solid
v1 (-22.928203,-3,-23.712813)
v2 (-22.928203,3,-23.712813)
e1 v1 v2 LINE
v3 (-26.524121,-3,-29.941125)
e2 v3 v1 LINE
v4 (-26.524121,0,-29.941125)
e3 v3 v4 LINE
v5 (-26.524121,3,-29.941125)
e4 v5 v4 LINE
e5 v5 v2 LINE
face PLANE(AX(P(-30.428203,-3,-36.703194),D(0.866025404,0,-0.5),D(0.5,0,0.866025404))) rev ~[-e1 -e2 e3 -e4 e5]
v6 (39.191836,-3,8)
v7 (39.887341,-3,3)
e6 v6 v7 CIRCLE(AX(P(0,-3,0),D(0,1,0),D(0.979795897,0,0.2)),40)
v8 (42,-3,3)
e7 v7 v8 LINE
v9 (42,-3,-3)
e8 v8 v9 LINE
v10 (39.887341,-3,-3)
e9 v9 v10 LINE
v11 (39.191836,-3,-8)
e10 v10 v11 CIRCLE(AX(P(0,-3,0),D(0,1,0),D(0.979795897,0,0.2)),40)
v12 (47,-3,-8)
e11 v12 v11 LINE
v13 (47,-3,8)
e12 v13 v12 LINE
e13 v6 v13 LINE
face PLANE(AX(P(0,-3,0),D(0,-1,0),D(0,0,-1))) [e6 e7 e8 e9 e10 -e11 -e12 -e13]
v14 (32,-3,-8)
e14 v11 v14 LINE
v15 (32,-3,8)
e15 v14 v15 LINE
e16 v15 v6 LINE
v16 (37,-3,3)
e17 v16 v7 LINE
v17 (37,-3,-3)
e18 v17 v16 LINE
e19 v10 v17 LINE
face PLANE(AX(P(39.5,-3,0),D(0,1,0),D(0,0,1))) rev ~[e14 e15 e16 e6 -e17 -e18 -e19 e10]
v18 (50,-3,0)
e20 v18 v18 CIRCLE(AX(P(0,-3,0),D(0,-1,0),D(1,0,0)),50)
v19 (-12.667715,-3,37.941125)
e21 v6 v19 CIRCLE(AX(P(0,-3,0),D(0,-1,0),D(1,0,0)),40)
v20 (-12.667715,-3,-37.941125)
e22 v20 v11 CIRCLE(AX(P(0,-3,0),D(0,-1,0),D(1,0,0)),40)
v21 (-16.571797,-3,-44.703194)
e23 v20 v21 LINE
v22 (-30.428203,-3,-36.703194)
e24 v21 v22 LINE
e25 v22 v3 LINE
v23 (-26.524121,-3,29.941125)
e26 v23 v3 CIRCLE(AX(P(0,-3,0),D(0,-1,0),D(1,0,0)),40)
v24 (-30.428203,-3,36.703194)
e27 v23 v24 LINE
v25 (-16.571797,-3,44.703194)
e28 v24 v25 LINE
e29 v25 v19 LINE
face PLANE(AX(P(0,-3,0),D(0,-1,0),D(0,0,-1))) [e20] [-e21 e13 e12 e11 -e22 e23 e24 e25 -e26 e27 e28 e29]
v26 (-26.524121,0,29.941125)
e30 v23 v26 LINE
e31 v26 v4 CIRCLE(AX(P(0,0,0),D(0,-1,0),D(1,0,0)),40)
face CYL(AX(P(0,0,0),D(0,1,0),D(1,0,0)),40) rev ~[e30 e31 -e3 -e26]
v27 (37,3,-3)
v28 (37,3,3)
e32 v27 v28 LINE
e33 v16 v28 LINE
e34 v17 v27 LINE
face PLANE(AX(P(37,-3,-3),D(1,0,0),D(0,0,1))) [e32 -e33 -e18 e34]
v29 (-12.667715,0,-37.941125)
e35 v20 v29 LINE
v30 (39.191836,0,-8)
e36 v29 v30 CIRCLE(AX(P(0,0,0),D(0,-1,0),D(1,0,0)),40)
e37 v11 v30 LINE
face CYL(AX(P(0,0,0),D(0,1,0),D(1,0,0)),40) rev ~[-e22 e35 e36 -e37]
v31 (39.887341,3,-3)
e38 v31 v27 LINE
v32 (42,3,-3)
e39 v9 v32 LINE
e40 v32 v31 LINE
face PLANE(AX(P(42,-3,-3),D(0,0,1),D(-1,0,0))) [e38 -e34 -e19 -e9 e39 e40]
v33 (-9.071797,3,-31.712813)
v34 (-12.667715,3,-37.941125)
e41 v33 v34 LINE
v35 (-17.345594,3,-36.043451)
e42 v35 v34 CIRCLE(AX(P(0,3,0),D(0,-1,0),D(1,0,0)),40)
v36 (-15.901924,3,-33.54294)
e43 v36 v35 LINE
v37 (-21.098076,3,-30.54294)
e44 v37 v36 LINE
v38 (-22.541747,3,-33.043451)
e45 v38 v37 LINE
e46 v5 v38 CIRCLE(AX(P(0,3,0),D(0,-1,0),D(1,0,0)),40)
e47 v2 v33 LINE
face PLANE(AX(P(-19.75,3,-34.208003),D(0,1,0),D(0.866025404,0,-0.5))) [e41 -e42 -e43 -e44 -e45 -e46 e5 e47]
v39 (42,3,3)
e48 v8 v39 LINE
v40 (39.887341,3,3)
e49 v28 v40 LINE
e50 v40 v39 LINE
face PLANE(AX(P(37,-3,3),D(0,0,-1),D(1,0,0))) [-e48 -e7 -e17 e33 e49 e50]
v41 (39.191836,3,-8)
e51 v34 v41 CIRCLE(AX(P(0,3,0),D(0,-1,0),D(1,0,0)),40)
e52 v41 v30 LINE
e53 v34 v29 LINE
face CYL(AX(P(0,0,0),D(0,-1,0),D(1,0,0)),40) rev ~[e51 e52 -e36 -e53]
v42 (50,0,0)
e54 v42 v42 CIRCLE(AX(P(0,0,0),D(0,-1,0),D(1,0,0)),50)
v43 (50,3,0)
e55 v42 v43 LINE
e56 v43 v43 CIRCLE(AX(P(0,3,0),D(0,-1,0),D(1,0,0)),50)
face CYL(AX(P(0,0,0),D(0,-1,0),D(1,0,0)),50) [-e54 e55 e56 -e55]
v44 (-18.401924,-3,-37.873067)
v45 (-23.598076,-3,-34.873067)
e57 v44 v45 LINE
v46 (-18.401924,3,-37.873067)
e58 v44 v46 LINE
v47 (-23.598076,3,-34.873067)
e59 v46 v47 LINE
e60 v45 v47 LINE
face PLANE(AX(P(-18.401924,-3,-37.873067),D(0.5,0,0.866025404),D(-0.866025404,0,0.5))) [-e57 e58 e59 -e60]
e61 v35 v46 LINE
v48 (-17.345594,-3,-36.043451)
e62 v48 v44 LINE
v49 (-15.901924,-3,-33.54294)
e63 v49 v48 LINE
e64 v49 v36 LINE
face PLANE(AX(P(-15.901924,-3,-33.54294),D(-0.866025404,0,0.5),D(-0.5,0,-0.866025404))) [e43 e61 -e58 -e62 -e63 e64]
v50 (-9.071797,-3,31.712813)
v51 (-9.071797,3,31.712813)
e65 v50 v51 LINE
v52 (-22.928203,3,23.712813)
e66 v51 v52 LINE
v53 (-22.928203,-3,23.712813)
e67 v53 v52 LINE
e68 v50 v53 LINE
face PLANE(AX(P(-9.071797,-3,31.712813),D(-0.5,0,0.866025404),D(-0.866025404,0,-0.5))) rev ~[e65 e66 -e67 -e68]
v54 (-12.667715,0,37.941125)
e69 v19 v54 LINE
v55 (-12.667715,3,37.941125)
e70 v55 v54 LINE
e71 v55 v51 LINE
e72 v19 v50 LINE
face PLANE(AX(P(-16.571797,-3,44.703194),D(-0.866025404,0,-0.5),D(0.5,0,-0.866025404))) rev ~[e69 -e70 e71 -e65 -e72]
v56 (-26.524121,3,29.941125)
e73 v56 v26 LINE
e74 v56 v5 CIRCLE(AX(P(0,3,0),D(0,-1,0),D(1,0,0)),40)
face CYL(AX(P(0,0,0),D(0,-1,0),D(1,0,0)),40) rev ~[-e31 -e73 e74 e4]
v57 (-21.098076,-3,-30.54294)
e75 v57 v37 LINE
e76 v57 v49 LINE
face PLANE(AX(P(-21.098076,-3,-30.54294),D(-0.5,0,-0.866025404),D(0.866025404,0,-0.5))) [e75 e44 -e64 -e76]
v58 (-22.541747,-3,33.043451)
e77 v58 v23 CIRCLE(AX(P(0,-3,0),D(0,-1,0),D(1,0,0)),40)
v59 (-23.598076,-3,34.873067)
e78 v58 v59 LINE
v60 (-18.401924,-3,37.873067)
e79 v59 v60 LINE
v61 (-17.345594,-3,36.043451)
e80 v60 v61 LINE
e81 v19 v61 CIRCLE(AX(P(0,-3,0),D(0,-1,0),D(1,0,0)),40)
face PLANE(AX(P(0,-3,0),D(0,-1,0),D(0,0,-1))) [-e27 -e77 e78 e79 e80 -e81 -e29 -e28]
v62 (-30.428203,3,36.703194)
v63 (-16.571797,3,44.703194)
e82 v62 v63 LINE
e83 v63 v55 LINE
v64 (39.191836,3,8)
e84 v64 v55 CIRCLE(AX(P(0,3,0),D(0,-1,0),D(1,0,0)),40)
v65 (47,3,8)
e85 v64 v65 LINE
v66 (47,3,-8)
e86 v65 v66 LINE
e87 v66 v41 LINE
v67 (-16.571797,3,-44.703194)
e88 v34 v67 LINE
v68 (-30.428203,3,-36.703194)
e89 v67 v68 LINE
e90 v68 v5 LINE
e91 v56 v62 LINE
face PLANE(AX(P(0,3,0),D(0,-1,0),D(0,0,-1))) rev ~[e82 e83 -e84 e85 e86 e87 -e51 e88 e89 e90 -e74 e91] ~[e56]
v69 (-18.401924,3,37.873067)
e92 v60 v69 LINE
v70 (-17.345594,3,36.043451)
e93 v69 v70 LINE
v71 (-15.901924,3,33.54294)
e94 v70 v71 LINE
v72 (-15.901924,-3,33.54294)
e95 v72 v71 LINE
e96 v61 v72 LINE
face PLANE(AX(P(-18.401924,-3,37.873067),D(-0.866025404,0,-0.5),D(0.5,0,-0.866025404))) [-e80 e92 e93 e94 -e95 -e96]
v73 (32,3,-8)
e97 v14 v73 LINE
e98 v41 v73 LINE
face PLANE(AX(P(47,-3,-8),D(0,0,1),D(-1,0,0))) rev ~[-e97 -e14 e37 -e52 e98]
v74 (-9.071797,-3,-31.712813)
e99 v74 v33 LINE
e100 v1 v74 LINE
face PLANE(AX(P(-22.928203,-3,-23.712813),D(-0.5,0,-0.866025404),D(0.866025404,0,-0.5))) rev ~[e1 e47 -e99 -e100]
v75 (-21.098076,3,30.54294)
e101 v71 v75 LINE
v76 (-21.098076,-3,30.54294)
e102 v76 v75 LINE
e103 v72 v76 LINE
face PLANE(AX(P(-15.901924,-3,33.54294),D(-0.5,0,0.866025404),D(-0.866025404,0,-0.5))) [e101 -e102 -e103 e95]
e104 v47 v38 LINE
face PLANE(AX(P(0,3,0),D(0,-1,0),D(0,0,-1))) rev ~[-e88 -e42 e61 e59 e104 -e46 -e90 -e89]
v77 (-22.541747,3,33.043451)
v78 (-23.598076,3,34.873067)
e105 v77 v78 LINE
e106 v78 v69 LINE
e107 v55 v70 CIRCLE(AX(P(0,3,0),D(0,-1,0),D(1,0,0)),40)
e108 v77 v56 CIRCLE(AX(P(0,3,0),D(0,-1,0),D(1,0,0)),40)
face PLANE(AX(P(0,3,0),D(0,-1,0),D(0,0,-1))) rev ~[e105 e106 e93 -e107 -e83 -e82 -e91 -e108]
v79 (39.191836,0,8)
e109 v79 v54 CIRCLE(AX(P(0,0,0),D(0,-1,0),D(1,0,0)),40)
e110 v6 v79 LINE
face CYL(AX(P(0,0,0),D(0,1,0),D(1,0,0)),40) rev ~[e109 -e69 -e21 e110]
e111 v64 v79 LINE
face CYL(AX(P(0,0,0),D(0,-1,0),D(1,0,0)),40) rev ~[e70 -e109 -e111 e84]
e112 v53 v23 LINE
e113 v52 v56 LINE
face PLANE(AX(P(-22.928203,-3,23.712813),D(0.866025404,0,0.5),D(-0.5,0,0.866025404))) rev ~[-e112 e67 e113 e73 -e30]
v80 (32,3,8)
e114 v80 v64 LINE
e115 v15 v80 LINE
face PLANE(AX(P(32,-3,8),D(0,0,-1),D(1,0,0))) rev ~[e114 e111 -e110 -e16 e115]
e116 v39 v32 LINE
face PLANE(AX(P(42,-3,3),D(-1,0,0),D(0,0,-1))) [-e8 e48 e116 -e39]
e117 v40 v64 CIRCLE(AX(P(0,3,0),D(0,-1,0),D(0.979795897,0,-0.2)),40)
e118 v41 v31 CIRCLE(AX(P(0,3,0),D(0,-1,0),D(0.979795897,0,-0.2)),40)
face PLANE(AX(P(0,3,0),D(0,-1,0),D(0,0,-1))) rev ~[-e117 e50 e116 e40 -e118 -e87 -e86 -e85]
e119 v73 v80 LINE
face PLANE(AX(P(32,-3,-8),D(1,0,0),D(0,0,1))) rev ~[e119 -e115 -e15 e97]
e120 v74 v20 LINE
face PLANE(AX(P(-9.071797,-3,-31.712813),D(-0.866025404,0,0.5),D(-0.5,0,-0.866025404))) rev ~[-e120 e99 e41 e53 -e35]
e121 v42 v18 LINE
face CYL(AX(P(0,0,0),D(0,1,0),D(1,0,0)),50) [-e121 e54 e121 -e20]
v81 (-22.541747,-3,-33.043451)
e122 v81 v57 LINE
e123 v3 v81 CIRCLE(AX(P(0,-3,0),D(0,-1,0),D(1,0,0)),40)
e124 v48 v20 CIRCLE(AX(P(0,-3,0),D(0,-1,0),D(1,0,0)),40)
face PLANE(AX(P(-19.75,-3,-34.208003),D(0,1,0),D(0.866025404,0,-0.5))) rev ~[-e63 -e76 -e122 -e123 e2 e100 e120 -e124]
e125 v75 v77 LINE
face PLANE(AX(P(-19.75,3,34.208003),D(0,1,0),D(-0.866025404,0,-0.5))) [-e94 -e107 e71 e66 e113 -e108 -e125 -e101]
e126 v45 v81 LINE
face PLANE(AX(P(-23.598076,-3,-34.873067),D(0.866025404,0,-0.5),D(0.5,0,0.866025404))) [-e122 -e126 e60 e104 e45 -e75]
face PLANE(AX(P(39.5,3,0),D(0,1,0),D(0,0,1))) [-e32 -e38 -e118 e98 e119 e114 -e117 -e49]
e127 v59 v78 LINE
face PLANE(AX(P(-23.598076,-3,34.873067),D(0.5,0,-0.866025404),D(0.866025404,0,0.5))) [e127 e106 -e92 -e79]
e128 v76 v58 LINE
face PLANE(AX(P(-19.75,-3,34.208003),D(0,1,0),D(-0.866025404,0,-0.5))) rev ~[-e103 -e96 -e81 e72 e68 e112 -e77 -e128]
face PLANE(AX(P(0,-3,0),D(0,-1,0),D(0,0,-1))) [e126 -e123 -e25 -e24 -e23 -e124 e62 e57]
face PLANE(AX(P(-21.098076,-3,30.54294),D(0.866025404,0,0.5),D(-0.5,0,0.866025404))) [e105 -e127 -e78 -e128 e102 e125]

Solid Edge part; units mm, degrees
sketch "Sketch1" plane through (0, 0, 0) normal (0, -1, 0) x (1, 0, 0)
  circle A0 centre (0, 0) radius 50
  circle A1 centre (0, 0) radius 40
  dimension "D1" = 100
  dimension "D2" = 80
extrude "Protrusion1" add sketch "Sketch1" along normal mid plane 6
sketch "Sketch2" plane through (0, -3, 0) normal (0, -1, 0) x (1, 0, 0)
  line L0 (32, 8) -> (47, 8)
  line L1 (47, 8) -> (47, -8)
  line L2 (47, -8) -> (32, -8)
  line L3 (32, -8) -> (32, 8)
extrude "Protrusion2" add sketch "Sketch2" against normal up to vertex (6 mm away)
pattern_circular "Pattern1" count 3 over 360 about axis through (0, -3, 0) along (0, -1, 0) of "Protrusion2"
sketch "Sketch3" plane through (0, -3, 0) normal (0, -1, 0) x (1, 0, 0)
  line L0 (42, 3) -> (42, -3)
  line L1 (42, -3) -> (37, -3)
  line L2 (37, -3) -> (37, 3)
  line L3 (37, 3) -> (42, 3)
extrude "Cutout1" cut sketch "Sketch3" against normal up to vertex (6 mm away)
pattern_circular "Pattern2" count 3 over 360 about axis through (0, -3, 0) along (0, -1, 0) of "Cutout1"
